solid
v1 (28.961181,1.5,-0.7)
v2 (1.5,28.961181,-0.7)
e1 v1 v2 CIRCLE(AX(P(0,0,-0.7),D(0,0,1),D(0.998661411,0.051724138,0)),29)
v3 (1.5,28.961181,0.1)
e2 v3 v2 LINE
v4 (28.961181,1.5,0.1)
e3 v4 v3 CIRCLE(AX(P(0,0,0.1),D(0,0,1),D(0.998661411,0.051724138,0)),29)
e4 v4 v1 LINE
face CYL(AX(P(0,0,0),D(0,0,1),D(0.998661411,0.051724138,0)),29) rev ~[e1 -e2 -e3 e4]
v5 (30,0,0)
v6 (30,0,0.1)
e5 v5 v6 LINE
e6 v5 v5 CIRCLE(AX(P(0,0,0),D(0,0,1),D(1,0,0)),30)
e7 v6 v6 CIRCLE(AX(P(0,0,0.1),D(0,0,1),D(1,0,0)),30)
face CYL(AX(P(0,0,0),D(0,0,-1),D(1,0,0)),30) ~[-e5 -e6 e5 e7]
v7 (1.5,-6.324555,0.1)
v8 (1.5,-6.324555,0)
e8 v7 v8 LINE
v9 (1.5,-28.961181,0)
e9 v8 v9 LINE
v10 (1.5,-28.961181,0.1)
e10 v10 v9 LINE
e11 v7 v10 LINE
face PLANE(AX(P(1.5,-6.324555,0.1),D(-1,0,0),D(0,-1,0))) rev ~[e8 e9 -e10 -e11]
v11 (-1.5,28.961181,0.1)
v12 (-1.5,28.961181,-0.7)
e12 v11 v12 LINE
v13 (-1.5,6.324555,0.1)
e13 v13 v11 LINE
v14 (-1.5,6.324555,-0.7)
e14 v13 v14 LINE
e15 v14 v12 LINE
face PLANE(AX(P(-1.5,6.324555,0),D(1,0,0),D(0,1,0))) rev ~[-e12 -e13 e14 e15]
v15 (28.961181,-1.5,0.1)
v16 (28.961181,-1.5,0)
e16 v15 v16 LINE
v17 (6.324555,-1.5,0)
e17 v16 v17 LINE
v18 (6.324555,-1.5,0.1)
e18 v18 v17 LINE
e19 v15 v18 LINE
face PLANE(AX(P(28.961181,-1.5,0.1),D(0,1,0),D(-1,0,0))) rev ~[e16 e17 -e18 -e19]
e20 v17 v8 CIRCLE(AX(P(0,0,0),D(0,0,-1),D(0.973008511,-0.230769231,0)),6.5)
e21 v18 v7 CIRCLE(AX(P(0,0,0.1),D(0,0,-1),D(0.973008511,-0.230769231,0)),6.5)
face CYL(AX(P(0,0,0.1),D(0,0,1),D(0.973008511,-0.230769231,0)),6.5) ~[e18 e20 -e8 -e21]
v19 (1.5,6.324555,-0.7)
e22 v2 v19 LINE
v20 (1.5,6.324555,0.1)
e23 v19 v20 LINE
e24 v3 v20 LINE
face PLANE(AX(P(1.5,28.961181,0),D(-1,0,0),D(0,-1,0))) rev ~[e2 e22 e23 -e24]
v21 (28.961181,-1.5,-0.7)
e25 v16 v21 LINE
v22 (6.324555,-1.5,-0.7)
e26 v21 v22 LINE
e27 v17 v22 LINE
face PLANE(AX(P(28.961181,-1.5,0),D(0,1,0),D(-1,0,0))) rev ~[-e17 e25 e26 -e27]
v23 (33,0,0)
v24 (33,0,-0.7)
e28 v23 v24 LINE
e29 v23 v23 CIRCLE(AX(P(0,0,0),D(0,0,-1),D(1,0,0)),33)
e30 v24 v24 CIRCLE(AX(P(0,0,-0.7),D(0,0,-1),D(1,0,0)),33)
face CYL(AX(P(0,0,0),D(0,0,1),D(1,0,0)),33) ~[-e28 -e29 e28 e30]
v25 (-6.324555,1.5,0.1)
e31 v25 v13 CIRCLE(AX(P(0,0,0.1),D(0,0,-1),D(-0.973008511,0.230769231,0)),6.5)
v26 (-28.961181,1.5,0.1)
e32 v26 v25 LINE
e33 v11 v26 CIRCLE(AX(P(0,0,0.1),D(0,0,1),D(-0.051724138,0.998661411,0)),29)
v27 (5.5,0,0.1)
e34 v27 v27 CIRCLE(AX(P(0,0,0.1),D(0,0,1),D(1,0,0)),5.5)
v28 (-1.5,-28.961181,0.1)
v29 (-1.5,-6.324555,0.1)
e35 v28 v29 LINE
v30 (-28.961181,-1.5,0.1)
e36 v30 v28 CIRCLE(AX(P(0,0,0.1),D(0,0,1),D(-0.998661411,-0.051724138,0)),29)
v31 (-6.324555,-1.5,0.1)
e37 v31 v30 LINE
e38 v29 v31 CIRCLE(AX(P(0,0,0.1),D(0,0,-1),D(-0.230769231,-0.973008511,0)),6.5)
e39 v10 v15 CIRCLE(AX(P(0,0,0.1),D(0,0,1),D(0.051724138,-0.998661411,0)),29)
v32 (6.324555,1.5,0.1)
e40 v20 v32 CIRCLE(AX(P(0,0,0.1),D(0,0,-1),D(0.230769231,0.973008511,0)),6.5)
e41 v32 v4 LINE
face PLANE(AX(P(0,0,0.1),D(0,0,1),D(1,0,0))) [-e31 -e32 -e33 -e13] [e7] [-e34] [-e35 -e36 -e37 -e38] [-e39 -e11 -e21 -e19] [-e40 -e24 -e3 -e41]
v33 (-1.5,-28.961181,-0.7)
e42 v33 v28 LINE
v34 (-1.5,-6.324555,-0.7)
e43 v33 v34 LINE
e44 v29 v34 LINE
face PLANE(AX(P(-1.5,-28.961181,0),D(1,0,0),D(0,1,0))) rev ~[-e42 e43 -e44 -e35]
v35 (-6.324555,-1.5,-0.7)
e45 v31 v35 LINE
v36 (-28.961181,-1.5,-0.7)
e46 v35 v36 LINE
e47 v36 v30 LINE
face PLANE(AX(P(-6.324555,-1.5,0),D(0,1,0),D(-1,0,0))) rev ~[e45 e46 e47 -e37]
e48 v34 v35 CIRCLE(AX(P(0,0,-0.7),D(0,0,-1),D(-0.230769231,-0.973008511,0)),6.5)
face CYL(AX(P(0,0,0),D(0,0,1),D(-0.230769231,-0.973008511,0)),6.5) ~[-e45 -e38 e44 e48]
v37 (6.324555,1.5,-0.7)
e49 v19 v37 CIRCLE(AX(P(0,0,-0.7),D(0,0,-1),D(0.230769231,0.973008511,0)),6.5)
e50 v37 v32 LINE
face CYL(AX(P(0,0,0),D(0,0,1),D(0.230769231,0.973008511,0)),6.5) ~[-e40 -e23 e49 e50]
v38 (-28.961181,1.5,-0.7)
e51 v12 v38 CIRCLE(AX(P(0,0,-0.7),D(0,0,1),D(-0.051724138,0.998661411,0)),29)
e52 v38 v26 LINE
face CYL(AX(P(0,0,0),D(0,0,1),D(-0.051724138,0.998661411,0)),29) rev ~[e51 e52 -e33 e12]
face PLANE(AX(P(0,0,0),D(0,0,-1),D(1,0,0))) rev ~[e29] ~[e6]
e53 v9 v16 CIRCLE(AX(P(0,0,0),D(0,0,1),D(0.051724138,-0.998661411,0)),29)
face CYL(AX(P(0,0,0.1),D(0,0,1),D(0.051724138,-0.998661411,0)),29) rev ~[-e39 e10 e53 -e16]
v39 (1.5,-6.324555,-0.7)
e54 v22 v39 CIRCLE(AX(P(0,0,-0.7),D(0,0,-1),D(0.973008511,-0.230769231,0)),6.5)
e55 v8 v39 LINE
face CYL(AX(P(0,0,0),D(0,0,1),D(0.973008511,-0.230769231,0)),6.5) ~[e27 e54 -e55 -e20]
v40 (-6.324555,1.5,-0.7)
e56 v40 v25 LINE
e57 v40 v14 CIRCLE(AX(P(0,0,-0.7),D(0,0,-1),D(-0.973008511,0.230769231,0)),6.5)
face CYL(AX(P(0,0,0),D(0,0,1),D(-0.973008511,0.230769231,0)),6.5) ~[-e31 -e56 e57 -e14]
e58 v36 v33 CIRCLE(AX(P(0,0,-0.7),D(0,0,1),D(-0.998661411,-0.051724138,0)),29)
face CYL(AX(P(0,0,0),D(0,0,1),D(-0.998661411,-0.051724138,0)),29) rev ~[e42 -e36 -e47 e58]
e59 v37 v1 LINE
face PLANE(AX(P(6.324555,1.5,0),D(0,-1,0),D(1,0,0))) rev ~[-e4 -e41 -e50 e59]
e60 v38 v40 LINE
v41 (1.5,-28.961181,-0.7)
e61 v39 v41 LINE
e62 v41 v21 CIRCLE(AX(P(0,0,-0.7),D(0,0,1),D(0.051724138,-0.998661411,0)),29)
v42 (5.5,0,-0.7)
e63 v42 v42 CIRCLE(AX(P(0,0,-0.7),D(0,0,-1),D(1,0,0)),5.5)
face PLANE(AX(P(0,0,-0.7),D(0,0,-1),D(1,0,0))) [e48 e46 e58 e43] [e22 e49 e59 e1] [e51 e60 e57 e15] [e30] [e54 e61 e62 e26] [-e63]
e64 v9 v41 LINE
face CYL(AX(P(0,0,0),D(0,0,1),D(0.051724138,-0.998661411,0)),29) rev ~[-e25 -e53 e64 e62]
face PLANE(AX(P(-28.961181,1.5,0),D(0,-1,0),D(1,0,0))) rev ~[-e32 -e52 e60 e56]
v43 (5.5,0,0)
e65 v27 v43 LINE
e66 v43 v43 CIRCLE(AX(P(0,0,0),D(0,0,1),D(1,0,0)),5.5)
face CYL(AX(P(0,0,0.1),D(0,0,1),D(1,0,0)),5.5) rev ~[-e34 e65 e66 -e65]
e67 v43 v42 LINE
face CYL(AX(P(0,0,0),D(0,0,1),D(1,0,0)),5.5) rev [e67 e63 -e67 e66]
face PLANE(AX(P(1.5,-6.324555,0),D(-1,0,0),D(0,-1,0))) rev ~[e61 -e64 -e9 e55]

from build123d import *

# Parameters (mm, degrees)
F0_R     = 30
F1_DEPTH = 0.1
F2_R     = 5.5
F3_DEPTH = 0.1
F5_DEPTH = 0.1
F6_R     = 33
F6_R_2   = 30
F6_R_3   = 5.5
F7_DEPTH = 0.7


with BuildPart() as f1:
    # F0 (on Top) → F1 (new body)
    with BuildSketch(Plane.XY):
        Circle(F0_R)
    extrude(amount=F1_DEPTH)

    # F2 (on face) → F3 (cut, through all)
    with BuildSketch(Plane.XY.offset(0.1)):
        Circle(F2_R)
    extrude(amount=-F3_DEPTH, mode=Mode.SUBTRACT)

    # F4 (on face) → F5 (cut, through all)
    with BuildSketch(Plane.XY.offset(0.1)):
        with BuildLine():
            Line((6.3245553203, 1.5), (28.9611809151, 1.5))
            ThreePointArc((28.9611809151, 1.5), (20.5060966544, 20.5060966544), (1.5, 28.9611809151))
            Line((1.5, 28.9611809151), (1.5, 6.3245553203))
            ThreePointArc((1.5, 6.3245553203), (4.5961940777, 4.5961940777), (6.3245553203, 1.5))
        make_face()
        with BuildLine():
            Line((-1.5, 6.3245553203), (-1.5, 28.9611809151))
            ThreePointArc((-1.5, 28.9611809151), (-20.5060966544, 20.5060966544), (-28.9611809151, 1.5))
            Line((-28.9611809151, 1.5), (-6.3245553203, 1.5))
            ThreePointArc((-6.3245553203, 1.5), (-4.5961940777, 4.5961940777), (-1.5, 6.3245553203))
        make_face()
        with BuildLine():
            ThreePointArc((-28.9611809151, -1.5), (-20.5060966544, -20.5060966544), (-1.5, -28.9611809151))
            Line((-1.5, -28.9611809151), (-1.5, -6.3245553203))
            ThreePointArc((-1.5, -6.3245553203), (-4.5961940777, -4.5961940777), (-6.3245553203, -1.5))
            Line((-6.3245553203, -1.5), (-28.9611809151, -1.5))
        make_face()
        with BuildLine():
            ThreePointArc((1.5, -28.9611809151), (20.5060966544, -20.5060966544), (28.9611809151, -1.5))
            Line((28.9611809151, -1.5), (6.3245553203, -1.5))
            ThreePointArc((6.3245553203, -1.5), (4.5961940777, -4.5961940777), (1.5, -6.3245553203))
            Line((1.5, -6.3245553203), (1.5, -28.9611809151))
        make_face()
    extrude(amount=-F5_DEPTH, mode=Mode.SUBTRACT)

    # F6 (on face) → F7 (join)
    with BuildSketch(Plane(origin=(0, 0, 0), x_dir=(1, 0, 0), z_dir=(0, 0, -1))):
        Circle(F6_R)
        Circle(F6_R_2, mode=Mode.SUBTRACT)
        Circle(F6_R_2)
        with BuildLine():
            Line((-1.5, -6.3245553203), (-1.5, -28.9611809151))
            ThreePointArc((-1.5, -28.9611809151), (-20.5060966544, -20.5060966544), (-28.9611809151, -1.5))
            Line((-28.9611809151, -1.5), (-6.3245553203, -1.5))
            ThreePointArc((-6.3245553203, -1.5), (-4.5961940777, -4.5961940777), (-1.5, -6.3245553203))
        make_face(mode=Mode.SUBTRACT)
        with BuildLine():
            ThreePointArc((28.9611809151, -1.5), (20.5060966544, -20.5060966544), (1.5, -28.9611809151))
            Line((1.5, -28.9611809151), (1.5, -6.3245553203))
            ThreePointArc((1.5, -6.3245553203), (4.5961940777, -4.5961940777), (6.3245553203, -1.5))
            Line((6.3245553203, -1.5), (28.9611809151, -1.5))
        make_face(mode=Mode.SUBTRACT)
        with BuildLine():
            ThreePointArc((-1.5, 6.3245553203), (-4.5961940777, 4.5961940777), (-6.3245553203, 1.5))
            Line((-6.3245553203, 1.5), (-28.9611809151, 1.5))
            ThreePointArc((-28.9611809151, 1.5), (-20.5060966544, 20.5060966544), (-1.5, 28.9611809151))
            Line((-1.5, 28.9611809151), (-1.5, 6.3245553203))
        make_face(mode=Mode.SUBTRACT)
        Circle(F6_R_3, mode=Mode.SUBTRACT)
        with BuildLine():
            Line((1.5, 6.3245553203), (1.5, 28.9611809151))
            ThreePointArc((1.5, 28.9611809151), (20.5060966544, 20.5060966544), (28.9611809151, 1.5))
            Line((28.9611809151, 1.5), (6.3245553203, 1.5))
            ThreePointArc((6.3245553203, 1.5), (4.5961940777, 4.5961940777), (1.5, 6.3245553203))
        make_face(mode=Mode.SUBTRACT)
    extrude(amount=F7_DEPTH)


solid = f1.part
